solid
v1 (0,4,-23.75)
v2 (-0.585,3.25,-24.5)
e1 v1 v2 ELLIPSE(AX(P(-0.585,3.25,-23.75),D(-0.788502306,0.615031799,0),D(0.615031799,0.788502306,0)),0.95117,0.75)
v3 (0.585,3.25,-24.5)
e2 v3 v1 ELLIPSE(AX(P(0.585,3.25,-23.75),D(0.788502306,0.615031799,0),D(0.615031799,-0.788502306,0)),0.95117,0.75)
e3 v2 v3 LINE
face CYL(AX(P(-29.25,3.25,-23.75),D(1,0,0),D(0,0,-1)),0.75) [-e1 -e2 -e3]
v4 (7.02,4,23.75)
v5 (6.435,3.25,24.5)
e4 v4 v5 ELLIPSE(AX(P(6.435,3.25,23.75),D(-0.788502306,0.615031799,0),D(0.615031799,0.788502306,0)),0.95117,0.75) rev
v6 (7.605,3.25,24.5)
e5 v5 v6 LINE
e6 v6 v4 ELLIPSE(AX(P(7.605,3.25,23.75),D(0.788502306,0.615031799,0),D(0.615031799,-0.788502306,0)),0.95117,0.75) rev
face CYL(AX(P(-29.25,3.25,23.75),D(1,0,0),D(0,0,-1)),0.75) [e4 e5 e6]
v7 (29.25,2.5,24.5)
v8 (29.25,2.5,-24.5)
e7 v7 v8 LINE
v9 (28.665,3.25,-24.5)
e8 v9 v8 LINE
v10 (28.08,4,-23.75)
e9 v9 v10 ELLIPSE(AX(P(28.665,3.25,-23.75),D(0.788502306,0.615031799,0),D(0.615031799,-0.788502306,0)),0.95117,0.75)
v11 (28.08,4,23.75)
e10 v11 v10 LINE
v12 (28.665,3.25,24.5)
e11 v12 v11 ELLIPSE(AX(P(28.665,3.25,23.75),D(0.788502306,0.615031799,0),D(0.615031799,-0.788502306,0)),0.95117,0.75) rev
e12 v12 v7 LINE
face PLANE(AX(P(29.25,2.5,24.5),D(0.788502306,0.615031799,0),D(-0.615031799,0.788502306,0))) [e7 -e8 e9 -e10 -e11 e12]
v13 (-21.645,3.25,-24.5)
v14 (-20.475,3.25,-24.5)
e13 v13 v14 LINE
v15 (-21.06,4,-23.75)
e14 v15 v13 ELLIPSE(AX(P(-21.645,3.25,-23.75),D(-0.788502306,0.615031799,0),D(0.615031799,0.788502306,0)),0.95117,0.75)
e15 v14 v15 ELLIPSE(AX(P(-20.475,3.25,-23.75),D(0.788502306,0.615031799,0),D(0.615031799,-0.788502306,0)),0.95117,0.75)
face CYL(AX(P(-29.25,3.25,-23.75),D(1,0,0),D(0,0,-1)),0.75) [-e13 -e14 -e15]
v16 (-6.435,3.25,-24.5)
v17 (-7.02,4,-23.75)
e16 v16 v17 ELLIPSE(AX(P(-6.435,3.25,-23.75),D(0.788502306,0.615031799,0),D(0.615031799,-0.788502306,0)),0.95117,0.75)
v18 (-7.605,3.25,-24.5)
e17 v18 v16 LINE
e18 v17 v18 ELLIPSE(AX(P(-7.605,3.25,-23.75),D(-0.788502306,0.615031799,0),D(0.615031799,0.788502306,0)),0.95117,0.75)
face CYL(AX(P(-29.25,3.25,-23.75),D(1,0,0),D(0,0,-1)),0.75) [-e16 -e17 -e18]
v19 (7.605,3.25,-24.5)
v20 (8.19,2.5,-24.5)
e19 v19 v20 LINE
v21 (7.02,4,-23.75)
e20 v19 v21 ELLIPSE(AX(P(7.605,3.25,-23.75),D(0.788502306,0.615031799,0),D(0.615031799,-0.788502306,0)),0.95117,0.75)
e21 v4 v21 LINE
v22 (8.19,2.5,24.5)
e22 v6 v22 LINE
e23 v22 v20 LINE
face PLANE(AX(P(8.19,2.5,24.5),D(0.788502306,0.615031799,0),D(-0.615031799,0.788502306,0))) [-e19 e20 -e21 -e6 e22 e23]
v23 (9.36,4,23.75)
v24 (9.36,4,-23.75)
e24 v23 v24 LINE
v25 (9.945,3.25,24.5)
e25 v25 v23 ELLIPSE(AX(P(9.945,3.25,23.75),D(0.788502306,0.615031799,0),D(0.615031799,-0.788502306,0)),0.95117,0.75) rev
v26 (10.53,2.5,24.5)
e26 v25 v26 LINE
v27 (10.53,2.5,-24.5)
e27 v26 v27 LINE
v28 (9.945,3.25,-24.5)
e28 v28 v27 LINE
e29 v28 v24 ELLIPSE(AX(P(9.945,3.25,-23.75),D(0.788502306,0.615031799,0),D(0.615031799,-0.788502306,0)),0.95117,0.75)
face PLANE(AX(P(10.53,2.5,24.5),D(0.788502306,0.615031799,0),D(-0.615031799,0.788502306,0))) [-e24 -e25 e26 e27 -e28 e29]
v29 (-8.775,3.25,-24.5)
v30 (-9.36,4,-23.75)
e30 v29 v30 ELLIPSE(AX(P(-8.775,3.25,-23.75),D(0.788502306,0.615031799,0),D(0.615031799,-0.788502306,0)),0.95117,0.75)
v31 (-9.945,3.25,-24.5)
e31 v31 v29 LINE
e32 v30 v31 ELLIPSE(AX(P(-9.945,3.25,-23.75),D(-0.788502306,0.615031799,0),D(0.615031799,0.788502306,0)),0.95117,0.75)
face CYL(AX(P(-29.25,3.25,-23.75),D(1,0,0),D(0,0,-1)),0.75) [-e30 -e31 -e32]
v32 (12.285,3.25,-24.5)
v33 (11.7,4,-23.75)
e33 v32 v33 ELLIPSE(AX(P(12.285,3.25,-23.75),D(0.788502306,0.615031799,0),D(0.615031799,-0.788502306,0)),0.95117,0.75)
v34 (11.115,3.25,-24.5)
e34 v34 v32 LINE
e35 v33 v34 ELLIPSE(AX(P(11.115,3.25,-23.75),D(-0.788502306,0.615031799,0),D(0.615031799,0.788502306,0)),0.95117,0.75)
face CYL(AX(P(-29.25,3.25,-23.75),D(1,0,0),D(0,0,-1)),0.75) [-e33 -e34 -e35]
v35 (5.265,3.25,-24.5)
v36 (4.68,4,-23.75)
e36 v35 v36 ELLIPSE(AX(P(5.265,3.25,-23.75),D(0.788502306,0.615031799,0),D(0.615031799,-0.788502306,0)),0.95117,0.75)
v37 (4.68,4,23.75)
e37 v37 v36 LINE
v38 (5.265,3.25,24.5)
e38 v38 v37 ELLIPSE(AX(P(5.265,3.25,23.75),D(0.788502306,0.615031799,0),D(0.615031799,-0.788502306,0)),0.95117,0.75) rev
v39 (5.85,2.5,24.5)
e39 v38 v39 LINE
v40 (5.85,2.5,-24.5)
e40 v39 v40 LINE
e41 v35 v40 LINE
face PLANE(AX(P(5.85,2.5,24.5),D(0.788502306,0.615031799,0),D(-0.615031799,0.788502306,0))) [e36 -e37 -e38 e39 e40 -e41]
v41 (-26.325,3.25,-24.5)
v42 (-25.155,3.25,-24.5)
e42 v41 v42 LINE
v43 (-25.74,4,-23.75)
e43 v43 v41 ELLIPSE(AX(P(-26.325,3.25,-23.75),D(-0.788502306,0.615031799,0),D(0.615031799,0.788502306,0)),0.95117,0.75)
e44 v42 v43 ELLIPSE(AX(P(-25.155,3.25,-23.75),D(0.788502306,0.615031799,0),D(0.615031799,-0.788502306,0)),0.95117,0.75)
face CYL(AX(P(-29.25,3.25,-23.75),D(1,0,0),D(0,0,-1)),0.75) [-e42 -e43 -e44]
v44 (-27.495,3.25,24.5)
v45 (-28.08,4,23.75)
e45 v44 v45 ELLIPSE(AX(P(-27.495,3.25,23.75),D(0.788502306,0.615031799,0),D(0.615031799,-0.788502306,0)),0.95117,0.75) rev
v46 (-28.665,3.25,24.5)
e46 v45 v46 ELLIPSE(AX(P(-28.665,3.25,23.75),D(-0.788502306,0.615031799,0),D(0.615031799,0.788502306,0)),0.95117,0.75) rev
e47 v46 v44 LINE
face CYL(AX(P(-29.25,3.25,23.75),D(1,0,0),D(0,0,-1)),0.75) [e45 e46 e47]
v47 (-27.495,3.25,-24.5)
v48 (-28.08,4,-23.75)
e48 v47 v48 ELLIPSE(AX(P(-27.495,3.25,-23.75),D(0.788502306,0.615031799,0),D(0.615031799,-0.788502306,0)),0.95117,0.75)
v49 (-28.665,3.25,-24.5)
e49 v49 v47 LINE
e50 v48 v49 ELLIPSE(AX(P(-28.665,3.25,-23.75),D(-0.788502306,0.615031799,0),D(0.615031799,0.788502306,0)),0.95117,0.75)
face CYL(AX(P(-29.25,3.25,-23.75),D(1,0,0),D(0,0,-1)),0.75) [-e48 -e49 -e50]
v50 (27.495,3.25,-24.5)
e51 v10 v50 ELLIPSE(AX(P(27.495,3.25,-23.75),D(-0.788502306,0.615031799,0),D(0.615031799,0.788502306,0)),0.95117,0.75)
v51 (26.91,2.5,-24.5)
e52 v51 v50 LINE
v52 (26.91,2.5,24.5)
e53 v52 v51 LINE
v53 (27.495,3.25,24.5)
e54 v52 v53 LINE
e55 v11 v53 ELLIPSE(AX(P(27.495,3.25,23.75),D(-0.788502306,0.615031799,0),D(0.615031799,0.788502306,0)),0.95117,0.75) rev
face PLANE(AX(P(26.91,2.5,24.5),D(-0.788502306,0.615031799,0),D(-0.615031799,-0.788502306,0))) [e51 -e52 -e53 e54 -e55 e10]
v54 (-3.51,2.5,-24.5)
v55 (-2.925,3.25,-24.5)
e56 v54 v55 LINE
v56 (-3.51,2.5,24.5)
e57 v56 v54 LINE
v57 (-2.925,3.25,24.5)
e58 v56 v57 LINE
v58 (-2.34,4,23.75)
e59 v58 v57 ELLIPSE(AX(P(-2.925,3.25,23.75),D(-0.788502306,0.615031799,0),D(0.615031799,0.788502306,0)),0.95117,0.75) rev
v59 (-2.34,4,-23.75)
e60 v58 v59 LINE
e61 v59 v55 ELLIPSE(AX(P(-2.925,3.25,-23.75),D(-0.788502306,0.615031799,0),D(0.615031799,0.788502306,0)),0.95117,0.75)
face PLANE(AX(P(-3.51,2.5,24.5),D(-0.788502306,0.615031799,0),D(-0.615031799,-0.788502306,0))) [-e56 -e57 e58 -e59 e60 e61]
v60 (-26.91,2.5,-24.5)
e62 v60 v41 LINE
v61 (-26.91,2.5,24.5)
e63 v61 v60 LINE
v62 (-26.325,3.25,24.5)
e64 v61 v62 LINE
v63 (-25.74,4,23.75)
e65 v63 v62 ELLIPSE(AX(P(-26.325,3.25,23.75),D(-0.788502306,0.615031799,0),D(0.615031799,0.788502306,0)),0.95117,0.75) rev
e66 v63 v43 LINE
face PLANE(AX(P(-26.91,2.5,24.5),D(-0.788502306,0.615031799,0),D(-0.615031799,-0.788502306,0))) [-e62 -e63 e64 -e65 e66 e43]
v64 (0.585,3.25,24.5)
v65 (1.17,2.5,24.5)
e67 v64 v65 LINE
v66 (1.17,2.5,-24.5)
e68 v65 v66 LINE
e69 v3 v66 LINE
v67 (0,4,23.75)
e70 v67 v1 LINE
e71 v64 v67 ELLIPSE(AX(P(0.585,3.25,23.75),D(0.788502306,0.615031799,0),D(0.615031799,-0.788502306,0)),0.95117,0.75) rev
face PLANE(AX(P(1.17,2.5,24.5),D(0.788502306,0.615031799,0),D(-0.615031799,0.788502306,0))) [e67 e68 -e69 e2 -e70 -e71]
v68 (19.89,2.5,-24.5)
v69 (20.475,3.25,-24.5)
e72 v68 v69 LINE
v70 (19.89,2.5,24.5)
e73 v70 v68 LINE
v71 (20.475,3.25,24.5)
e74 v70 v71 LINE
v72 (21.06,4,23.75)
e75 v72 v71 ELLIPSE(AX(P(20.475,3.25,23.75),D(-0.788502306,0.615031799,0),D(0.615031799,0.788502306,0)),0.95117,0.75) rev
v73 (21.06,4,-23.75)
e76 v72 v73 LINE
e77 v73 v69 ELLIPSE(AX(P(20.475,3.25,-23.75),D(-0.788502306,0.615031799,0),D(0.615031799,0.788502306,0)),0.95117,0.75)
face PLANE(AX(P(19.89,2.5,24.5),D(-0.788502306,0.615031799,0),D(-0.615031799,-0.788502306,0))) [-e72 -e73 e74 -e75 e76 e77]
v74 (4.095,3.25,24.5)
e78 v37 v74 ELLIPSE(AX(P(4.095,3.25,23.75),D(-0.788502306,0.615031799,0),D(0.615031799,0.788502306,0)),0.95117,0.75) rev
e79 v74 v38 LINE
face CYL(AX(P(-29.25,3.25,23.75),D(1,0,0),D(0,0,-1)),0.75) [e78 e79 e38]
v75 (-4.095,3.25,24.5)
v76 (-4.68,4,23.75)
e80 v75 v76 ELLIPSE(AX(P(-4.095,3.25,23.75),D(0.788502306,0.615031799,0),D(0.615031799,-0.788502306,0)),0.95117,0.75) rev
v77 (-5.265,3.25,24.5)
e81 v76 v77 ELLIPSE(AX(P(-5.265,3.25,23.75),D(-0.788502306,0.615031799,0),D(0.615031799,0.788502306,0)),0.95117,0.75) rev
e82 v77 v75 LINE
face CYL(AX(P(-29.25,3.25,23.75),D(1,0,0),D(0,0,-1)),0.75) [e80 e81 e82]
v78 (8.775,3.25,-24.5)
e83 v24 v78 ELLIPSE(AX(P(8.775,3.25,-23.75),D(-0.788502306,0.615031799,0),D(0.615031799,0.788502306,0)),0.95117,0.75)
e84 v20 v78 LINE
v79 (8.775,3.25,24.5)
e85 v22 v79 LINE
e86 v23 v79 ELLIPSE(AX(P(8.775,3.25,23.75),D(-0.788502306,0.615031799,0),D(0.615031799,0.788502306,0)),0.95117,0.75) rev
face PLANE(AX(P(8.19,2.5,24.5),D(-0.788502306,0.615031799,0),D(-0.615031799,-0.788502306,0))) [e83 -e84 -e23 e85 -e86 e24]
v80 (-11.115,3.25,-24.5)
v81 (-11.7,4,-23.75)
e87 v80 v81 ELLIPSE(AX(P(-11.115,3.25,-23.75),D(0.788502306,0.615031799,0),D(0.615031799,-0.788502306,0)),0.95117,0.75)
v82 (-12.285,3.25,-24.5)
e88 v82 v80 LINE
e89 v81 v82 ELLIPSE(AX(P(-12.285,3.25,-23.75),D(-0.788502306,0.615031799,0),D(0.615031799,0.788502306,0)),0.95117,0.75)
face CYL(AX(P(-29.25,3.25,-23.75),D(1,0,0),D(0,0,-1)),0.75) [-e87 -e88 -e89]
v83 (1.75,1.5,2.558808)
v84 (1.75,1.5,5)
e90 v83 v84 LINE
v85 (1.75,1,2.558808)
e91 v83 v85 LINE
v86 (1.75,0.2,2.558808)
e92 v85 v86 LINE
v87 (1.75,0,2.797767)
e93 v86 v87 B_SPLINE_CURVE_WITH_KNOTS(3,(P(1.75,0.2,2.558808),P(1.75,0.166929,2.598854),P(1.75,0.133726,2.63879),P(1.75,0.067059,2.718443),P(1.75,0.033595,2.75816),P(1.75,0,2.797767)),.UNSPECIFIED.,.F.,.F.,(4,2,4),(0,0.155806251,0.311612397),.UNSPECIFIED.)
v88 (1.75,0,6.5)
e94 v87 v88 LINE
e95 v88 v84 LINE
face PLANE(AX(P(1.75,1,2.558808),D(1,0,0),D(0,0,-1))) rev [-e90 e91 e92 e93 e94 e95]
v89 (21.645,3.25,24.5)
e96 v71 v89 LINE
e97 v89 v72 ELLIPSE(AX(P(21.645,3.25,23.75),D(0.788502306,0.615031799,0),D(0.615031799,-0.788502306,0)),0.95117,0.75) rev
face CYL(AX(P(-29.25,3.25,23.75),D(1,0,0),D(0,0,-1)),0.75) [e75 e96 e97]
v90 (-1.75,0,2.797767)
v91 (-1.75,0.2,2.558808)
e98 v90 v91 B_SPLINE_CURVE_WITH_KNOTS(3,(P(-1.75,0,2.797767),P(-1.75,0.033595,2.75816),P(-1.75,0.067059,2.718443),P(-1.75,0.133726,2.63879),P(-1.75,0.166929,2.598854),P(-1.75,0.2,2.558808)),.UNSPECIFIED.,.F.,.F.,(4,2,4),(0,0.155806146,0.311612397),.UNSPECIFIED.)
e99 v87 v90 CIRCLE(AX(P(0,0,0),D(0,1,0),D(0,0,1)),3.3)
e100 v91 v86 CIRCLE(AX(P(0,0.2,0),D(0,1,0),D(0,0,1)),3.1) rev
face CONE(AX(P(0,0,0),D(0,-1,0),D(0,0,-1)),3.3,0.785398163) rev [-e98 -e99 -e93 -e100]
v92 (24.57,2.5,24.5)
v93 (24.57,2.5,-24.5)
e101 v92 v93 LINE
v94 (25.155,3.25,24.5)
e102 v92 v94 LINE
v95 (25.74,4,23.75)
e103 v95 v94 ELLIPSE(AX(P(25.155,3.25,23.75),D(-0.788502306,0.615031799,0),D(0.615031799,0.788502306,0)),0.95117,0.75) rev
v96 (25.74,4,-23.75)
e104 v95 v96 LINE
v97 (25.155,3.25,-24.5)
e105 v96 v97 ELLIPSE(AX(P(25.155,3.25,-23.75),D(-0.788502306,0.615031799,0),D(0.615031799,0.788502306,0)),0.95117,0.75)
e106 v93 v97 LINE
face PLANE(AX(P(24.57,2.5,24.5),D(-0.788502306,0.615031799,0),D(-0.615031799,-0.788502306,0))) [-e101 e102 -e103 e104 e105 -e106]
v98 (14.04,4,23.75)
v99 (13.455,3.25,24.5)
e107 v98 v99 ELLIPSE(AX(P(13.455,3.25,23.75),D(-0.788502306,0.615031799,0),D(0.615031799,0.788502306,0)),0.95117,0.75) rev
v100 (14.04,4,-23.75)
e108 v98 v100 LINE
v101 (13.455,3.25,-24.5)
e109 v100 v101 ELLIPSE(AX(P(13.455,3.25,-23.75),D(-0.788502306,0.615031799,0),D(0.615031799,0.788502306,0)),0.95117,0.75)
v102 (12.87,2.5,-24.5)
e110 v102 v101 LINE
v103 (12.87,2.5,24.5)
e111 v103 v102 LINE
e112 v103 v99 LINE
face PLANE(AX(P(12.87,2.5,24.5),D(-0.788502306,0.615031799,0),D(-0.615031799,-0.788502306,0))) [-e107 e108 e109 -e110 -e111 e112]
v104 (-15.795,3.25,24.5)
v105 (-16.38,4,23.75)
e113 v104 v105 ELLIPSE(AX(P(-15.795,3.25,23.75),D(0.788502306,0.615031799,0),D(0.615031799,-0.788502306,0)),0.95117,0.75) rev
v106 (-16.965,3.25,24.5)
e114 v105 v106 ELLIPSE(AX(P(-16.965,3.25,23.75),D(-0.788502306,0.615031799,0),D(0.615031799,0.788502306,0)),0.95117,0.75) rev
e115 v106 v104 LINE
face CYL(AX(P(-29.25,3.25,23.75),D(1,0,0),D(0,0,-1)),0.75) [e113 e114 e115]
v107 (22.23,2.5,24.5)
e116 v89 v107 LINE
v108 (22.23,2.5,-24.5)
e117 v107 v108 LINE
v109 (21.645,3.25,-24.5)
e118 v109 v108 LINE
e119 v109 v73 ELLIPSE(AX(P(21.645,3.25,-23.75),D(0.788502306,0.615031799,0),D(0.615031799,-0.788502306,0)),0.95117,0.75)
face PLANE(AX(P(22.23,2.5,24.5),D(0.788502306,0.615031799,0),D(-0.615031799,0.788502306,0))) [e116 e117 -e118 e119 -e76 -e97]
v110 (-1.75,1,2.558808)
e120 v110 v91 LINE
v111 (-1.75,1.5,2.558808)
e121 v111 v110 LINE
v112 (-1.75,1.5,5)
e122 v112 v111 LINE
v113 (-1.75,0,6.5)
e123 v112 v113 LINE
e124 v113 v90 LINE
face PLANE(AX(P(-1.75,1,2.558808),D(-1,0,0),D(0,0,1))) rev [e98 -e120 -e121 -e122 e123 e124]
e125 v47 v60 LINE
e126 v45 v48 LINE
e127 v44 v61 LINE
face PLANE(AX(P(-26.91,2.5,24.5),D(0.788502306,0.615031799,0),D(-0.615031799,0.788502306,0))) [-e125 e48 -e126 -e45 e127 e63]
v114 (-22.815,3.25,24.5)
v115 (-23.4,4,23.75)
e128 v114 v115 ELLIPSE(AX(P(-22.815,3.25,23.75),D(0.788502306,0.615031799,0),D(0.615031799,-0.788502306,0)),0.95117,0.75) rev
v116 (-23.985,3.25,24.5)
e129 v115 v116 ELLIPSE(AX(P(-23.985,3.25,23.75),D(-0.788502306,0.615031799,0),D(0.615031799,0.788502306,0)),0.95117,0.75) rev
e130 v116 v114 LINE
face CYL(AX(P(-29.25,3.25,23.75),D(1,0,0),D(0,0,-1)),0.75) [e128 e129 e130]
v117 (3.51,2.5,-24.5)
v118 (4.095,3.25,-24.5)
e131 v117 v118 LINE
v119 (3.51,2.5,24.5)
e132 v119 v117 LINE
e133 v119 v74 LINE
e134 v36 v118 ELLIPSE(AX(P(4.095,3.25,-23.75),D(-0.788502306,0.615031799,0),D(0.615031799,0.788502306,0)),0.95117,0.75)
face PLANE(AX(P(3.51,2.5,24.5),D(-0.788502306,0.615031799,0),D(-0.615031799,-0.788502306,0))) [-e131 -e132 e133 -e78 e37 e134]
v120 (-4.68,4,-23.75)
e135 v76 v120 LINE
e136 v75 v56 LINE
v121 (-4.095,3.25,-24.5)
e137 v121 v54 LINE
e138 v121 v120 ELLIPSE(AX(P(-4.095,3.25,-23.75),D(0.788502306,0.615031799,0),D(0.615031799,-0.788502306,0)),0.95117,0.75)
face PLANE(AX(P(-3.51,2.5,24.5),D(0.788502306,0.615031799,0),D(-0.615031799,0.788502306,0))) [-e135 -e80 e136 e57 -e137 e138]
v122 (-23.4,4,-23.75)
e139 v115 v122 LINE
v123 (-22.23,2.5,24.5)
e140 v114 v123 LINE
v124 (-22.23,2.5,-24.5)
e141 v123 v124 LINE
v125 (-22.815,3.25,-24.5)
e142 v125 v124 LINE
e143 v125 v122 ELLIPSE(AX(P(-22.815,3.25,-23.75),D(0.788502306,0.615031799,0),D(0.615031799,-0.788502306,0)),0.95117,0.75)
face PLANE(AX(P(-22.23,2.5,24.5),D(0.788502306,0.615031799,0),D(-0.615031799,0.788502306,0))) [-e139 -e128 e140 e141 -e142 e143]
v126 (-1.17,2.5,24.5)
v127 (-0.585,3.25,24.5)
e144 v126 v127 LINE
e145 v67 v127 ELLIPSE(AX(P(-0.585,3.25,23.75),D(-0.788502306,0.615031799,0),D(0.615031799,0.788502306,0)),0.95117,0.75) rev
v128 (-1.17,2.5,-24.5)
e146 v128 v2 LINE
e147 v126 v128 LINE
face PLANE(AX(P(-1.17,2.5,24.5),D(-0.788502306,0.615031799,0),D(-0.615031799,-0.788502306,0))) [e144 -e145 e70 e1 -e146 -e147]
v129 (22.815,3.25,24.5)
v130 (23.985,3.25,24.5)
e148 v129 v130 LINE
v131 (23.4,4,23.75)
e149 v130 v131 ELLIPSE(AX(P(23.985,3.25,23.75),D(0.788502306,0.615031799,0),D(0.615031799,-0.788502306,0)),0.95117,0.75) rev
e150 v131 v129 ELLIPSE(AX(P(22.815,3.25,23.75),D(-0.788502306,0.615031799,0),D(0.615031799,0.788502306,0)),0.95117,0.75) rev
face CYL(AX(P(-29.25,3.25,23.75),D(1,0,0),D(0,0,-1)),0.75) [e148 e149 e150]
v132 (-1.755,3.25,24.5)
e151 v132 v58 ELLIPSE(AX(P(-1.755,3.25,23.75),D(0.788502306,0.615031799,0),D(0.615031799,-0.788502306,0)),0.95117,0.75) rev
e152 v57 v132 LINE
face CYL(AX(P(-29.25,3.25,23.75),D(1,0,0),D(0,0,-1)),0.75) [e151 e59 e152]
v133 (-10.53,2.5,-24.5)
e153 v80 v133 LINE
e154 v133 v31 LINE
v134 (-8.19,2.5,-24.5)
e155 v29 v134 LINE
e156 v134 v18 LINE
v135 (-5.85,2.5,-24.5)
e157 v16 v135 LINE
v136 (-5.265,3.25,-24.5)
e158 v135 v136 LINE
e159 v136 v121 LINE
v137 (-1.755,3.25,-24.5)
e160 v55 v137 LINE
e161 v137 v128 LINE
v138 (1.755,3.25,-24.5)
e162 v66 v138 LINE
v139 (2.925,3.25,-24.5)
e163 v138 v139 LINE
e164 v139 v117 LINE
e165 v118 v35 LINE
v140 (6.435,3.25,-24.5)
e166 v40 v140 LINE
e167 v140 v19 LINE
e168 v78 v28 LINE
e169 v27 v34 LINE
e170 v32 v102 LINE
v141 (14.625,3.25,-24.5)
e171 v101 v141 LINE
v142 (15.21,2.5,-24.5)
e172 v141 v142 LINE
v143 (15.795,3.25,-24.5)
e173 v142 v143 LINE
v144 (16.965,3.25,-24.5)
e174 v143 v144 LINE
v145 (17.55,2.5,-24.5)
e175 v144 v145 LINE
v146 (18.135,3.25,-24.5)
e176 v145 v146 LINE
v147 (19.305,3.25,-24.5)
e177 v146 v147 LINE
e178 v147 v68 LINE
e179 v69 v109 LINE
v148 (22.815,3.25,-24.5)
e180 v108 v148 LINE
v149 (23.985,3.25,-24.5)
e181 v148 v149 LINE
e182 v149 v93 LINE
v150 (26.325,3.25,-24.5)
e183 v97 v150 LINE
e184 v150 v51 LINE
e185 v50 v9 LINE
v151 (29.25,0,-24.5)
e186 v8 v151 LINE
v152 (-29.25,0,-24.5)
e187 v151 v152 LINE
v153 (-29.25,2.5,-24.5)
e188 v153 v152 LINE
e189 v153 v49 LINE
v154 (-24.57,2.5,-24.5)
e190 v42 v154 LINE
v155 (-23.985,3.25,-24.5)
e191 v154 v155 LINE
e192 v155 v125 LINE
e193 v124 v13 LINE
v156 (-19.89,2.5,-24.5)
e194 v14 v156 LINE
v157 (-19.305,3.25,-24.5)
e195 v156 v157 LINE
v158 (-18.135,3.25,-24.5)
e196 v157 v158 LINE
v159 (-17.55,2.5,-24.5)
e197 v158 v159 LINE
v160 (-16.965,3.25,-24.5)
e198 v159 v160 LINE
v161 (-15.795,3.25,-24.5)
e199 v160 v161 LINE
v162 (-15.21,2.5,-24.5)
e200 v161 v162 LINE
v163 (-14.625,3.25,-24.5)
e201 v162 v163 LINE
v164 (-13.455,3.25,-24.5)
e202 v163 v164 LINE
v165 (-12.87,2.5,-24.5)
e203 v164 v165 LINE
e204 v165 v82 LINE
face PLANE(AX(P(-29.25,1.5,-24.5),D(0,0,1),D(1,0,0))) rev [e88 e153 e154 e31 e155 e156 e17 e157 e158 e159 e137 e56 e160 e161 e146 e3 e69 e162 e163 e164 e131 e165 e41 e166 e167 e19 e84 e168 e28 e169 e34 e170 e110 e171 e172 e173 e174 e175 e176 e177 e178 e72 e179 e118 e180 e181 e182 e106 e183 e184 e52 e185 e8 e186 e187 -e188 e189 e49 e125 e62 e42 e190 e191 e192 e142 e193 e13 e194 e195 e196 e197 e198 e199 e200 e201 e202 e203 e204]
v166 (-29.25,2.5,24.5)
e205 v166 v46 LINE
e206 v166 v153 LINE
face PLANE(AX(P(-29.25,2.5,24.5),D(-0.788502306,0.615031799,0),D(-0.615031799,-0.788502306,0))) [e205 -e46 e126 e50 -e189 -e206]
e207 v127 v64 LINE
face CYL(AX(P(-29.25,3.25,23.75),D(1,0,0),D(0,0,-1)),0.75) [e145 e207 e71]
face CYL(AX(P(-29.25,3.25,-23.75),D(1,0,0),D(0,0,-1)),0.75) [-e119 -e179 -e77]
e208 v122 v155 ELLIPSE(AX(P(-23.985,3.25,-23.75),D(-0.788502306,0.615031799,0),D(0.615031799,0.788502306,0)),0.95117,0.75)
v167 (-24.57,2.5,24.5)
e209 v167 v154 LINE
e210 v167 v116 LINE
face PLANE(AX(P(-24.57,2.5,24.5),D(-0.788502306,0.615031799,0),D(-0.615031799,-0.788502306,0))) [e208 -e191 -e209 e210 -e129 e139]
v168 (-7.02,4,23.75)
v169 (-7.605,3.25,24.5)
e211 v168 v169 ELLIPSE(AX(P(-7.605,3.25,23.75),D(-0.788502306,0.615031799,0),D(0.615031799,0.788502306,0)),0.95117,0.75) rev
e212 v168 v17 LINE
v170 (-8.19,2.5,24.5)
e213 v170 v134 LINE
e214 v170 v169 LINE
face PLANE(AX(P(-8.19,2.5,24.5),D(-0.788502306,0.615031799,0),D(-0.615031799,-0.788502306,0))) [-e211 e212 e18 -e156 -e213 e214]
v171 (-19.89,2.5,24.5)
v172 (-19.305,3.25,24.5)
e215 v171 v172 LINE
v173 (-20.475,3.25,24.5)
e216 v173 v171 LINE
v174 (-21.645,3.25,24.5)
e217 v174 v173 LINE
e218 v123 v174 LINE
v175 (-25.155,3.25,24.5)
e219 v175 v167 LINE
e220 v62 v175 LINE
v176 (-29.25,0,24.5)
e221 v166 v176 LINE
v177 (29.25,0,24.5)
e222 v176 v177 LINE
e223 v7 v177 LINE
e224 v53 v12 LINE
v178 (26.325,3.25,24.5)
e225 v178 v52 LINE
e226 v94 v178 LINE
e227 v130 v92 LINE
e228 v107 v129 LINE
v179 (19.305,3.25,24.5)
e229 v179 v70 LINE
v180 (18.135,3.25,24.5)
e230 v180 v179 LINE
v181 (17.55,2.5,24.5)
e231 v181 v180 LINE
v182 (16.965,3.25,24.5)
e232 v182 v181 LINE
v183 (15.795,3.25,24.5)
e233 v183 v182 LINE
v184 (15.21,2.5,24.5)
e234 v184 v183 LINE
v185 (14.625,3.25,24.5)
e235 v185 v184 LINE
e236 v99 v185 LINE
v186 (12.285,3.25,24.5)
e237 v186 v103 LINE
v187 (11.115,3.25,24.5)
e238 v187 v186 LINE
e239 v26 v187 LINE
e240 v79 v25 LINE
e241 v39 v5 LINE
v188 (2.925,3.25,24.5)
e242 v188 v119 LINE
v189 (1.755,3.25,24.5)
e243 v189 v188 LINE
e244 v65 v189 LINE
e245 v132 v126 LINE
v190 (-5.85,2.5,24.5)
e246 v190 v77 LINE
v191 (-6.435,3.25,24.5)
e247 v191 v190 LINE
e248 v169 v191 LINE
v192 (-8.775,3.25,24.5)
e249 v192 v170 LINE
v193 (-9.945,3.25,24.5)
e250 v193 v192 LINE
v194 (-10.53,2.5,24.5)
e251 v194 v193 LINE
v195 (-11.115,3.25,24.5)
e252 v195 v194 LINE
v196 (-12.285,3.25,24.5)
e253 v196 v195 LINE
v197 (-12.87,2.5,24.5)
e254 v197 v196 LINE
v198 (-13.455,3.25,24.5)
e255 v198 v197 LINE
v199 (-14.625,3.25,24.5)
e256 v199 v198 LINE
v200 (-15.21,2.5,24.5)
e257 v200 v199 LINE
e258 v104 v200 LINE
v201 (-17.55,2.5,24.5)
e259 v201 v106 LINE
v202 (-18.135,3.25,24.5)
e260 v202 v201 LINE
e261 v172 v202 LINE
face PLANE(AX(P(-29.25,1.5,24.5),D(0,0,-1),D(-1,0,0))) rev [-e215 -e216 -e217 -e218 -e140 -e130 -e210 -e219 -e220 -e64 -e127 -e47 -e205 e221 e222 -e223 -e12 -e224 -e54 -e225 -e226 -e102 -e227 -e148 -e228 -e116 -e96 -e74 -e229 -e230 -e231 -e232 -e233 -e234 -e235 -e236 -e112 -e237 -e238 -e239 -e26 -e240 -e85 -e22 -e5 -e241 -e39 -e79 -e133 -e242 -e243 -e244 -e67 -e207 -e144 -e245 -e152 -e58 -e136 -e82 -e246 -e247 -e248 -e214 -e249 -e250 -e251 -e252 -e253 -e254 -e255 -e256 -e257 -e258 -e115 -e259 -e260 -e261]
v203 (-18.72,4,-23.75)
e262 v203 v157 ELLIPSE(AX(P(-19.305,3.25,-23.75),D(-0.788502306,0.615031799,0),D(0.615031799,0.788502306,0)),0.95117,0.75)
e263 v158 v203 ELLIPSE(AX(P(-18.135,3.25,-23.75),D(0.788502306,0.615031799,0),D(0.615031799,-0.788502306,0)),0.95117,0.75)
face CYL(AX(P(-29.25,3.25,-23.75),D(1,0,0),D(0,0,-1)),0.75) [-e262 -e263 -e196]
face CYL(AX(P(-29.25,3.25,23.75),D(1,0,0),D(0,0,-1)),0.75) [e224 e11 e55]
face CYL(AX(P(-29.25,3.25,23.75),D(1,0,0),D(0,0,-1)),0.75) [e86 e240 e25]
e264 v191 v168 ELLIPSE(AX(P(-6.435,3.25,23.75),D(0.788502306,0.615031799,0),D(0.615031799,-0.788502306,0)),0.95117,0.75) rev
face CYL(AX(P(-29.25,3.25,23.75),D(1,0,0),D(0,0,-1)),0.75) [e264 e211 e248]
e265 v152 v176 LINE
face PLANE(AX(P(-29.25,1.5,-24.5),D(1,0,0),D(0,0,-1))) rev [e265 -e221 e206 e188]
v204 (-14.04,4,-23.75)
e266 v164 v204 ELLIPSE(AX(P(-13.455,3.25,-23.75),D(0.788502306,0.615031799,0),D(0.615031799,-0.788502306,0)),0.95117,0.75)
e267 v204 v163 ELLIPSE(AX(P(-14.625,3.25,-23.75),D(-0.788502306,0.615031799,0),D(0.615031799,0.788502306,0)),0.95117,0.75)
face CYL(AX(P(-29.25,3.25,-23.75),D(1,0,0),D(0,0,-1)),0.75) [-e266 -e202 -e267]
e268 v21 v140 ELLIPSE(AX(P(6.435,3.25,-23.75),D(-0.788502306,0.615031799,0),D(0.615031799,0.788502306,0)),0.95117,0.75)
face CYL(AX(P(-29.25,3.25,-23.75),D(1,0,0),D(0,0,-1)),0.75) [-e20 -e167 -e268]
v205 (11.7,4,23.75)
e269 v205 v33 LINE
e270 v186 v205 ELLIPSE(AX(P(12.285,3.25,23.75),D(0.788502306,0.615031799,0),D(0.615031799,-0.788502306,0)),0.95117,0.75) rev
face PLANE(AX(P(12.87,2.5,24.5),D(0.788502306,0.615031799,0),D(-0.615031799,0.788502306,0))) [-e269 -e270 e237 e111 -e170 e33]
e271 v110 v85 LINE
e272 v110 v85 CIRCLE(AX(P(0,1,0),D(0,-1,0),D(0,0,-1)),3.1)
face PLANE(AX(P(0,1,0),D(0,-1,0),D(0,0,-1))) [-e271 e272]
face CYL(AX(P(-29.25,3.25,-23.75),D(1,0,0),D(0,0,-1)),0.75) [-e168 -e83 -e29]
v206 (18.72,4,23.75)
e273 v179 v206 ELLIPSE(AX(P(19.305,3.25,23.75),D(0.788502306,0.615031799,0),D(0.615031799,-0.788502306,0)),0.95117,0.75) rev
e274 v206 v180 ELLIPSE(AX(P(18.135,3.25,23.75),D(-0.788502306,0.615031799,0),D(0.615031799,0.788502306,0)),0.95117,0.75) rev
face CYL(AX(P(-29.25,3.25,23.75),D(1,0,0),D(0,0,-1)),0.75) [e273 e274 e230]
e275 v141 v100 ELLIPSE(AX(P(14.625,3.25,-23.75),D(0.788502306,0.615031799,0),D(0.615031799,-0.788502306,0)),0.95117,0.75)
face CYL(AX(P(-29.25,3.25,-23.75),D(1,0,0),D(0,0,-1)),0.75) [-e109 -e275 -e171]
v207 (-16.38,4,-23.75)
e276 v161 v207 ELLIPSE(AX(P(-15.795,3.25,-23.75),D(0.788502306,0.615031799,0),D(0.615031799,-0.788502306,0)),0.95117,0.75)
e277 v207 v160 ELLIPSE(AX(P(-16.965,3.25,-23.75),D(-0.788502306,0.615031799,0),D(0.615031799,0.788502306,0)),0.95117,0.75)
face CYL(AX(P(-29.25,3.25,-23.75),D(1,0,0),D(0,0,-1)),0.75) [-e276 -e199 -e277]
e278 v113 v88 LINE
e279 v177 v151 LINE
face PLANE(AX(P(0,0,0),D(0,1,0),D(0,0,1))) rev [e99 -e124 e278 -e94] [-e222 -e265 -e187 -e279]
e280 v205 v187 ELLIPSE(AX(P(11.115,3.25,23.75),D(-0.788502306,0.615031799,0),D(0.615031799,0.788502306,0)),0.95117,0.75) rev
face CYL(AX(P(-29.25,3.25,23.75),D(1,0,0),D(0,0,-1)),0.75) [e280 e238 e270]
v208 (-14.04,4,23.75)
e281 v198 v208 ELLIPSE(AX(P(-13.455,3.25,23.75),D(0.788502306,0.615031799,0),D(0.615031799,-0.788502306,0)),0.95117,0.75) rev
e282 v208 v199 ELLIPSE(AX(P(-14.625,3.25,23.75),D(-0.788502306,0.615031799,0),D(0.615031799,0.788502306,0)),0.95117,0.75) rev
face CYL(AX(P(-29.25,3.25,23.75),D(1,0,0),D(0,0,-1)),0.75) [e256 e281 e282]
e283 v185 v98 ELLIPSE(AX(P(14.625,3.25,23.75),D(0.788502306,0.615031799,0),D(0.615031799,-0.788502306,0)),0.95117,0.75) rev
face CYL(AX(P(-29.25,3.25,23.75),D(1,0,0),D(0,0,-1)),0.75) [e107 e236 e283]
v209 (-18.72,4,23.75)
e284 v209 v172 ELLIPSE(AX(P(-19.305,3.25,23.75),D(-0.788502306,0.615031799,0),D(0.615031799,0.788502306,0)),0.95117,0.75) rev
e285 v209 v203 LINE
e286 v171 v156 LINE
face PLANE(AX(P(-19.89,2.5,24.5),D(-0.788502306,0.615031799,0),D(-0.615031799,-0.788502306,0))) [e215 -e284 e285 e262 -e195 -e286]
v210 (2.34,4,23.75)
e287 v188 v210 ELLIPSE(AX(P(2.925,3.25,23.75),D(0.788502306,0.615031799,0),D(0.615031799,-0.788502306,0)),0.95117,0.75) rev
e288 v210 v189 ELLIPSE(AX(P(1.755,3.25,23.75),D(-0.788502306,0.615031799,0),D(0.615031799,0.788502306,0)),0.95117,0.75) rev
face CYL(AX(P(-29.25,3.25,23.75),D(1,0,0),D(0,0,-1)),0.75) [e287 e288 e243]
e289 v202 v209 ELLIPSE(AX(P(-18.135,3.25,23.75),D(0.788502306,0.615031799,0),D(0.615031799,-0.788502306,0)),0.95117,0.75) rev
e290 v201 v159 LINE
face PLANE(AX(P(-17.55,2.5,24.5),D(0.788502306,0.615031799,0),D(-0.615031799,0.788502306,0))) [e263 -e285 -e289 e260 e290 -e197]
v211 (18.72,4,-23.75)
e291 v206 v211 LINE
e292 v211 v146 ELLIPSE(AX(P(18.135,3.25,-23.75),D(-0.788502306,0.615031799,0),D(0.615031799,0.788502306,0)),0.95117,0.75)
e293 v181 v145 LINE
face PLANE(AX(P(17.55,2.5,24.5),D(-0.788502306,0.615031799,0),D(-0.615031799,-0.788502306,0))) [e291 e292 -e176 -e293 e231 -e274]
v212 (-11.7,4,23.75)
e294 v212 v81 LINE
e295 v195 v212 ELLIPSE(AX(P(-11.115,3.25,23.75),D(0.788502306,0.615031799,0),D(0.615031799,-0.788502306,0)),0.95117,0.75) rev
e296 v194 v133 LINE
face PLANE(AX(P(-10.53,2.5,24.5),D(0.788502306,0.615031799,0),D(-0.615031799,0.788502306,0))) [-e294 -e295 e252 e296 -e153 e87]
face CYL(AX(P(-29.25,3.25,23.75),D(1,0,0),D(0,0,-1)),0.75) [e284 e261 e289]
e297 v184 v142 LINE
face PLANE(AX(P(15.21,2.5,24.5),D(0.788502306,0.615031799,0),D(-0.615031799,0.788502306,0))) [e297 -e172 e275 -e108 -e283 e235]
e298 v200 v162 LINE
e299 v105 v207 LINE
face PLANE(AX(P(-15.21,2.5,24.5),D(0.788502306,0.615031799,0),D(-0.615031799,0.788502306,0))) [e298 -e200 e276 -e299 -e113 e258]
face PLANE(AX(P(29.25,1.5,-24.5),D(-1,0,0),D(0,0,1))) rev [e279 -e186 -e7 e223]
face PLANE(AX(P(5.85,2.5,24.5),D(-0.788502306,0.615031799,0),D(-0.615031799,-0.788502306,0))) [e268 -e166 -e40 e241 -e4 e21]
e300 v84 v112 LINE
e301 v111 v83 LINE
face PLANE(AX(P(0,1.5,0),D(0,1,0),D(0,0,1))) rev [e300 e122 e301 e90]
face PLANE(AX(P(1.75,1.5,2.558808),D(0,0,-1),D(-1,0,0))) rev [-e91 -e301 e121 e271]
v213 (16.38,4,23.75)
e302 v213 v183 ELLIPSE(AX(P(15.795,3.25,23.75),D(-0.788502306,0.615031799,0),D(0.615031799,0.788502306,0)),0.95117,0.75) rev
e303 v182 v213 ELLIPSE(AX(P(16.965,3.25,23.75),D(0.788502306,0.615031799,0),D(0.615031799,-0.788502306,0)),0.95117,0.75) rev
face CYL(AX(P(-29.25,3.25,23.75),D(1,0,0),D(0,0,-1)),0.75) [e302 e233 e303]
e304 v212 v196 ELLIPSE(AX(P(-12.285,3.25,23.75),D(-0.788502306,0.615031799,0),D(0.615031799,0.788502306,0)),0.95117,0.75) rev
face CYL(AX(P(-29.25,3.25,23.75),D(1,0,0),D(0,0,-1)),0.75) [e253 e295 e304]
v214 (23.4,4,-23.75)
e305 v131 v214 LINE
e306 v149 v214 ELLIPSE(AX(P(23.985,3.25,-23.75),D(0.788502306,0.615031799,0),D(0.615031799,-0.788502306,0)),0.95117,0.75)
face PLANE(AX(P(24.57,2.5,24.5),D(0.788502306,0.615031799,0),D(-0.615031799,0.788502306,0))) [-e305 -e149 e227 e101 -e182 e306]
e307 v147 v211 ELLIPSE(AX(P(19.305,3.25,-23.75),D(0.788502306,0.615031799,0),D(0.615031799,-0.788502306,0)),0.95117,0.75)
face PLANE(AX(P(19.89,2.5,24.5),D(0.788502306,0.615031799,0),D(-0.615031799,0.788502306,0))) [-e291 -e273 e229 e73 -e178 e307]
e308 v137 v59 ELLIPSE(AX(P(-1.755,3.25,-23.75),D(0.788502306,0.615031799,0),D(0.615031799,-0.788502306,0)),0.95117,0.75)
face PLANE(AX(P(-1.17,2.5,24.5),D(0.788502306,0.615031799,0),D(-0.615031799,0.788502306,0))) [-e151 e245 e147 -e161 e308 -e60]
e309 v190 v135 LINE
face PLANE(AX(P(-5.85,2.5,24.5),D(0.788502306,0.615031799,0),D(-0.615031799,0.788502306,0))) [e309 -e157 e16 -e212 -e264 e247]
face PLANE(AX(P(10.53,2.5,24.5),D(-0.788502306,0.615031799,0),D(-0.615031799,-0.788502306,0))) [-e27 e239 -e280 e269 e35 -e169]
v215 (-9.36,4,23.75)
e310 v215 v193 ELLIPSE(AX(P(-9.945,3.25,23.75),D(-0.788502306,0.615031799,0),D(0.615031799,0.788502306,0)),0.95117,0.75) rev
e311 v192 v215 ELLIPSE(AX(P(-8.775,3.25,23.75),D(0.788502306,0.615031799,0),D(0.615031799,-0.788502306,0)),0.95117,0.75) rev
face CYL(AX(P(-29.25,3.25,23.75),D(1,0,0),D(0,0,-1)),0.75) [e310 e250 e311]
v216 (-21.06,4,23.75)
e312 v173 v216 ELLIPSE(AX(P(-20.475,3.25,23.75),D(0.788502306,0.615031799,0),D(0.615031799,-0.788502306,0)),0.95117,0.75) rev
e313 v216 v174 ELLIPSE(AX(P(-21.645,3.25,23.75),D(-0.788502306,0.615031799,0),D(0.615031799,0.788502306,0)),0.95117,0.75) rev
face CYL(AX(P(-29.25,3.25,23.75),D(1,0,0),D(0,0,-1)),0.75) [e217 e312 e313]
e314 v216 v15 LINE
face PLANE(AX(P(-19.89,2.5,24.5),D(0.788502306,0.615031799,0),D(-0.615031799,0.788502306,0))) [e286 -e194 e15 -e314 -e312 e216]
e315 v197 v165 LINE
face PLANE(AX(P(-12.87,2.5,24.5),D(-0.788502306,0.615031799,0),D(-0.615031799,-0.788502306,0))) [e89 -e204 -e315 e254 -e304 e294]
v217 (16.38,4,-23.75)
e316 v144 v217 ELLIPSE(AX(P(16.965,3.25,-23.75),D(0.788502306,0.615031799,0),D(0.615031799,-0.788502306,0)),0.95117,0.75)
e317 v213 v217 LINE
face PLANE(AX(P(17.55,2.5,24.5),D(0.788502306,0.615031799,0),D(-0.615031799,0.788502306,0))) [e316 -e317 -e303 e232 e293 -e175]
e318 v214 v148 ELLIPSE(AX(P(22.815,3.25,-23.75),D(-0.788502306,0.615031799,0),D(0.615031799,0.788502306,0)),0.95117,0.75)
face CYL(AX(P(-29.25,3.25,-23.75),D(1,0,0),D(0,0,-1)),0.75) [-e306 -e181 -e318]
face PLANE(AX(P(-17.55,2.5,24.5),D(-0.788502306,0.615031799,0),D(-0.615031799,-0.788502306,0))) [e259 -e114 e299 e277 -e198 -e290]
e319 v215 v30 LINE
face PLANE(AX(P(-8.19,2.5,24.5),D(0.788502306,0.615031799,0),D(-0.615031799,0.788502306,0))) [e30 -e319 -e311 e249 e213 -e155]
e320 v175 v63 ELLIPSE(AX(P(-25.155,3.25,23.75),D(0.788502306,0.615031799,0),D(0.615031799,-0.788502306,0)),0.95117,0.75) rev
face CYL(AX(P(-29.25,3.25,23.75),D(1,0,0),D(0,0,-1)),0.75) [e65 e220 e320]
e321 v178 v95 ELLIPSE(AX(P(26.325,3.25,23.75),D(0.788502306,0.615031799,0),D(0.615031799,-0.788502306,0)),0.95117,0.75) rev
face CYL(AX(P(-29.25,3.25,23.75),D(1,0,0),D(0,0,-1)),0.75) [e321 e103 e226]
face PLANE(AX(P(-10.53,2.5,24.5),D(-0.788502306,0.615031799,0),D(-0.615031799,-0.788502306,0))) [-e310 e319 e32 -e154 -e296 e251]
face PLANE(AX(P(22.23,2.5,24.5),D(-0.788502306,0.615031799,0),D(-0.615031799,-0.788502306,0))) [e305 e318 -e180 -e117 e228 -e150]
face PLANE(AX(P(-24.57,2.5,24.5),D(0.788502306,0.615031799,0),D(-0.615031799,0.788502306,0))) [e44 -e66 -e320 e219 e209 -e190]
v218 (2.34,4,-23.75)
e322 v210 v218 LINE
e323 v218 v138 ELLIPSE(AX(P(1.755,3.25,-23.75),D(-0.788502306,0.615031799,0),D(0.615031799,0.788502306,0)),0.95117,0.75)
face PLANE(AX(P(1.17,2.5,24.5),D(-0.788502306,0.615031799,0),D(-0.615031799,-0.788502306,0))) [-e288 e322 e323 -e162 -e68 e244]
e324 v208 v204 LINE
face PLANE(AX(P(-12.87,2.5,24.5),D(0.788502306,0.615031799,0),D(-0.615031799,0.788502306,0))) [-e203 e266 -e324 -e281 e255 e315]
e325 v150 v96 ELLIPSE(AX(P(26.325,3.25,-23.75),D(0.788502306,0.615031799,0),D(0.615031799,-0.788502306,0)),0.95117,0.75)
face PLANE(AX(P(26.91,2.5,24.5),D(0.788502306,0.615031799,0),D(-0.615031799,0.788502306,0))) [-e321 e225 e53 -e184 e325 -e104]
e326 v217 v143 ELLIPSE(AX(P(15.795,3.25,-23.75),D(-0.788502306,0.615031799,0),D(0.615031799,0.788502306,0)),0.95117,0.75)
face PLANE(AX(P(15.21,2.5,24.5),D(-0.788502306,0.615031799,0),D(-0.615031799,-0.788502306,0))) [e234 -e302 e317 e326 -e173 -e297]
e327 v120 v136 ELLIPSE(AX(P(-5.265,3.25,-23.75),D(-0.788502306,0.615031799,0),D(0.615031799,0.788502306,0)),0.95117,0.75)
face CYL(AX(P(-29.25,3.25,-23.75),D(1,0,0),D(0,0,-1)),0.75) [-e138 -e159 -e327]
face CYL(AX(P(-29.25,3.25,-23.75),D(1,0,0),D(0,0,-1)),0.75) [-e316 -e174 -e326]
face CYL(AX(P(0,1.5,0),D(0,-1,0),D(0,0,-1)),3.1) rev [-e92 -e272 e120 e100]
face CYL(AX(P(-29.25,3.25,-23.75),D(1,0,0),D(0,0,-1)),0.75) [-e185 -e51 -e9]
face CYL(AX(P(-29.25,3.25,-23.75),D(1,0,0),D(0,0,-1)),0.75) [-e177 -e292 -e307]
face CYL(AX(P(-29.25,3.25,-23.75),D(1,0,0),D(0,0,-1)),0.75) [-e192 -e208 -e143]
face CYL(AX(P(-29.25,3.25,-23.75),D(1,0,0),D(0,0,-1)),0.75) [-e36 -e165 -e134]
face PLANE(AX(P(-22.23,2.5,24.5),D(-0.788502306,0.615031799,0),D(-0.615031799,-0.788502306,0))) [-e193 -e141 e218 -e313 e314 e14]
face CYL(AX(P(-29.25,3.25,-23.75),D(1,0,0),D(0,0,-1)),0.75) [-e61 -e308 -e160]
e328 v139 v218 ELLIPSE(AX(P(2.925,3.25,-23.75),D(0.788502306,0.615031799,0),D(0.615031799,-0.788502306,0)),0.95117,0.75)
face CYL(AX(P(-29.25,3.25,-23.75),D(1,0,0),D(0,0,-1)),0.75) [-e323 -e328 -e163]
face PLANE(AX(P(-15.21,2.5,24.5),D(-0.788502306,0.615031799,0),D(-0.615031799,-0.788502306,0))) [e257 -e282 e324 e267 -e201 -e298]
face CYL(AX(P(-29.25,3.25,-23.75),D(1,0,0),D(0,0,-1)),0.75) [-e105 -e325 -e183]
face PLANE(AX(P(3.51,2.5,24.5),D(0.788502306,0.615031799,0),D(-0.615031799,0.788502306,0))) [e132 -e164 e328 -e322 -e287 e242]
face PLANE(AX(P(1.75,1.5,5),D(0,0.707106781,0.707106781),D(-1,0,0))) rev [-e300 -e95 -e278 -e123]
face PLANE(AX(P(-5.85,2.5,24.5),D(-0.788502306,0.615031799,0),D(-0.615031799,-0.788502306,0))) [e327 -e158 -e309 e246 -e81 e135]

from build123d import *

# Parameters (mm, degrees)
SKETCH1_W           = 58.5
SKETCH1_H           = 49
SKETCH1_R           = 3.1
BOSS_EXTRUDE1_DEPTH = 1.5
BOSS_EXTRUDE2_DEPTH = 49
CUT_EXTRUDE1_DEPTH  = 1
CHAMFER2_SIZE       = 0.2
CUT_EXTRUDE3_DEPTH  = 64.549193543
BOSS_EXTRUDE3_START = 0.5
SKETCH5_R           = 3.1
BOSS_EXTRUDE3_DEPTH = 0.5
SKETCH6_W           = 3.5
SKETCH6_H           = 2.441191684
CUT_EXTRUDE4_DEPTH  = 0.5
CHAMFER3_SIZE       = 1.5


with BuildPart() as part:
    # Sketch1 → Boss-Extrude1 (new body)
    with BuildSketch(Plane(origin=(0, 0, 0), x_dir=(1, 0, 0), z_dir=(0, 1, 0))):
        Rectangle(SKETCH1_W, SKETCH1_H)
        with Locations(Location((0, 0, 0), (0, 0, 270))):
            Circle(SKETCH1_R, mode=Mode.SUBTRACT)
    extrude(amount=BOSS_EXTRUDE1_DEPTH)

    # Sketch2 → Boss-Extrude2 (add)
    with BuildSketch(Plane(origin=(0, 0, -24.5), x_dir=(-1, 0, 0), z_dir=(0, 0, -1))):
        Polygon((-29.25, 1.5), (29.25, 1.5), (29.25, 2.5), (28.08, 4), (26.91, 2.5), (25.74, 4), (24.57, 2.5), (23.4, 4), (22.23, 2.5), (21.06, 4), (19.89, 2.5), (18.72, 4), (17.55, 2.5), (16.38, 4), (15.21, 2.5), (14.04, 4), (12.87, 2.5), (11.7, 4), (10.53, 2.5), (9.36, 4), (8.19, 2.5), (7.02, 4), (5.85, 2.5), (4.68, 4), (3.51, 2.5), (2.34, 4), (1.17, 2.5), (0, 4), (-1.17, 2.5), (-2.34, 4), (-3.51, 2.5), (-4.68, 4), (-5.85, 2.5), (-7.02, 4), (-8.19, 2.5), (-9.36, 4), (-10.53, 2.5), (-11.7, 4), (-12.87, 2.5), (-14.04, 4), (-15.21, 2.5), (-16.38, 4), (-17.55, 2.5), (-18.72, 4), (-19.89, 2.5), (-21.06, 4), (-22.23, 2.5), (-23.4, 4), (-24.57, 2.5), (-25.74, 4), (-26.91, 2.5), (-28.08, 4), (-29.25, 2.5), align=None)
    extrude(amount=-BOSS_EXTRUDE2_DEPTH)

    # Sketch3 → Cut-Extrude1 (cut)
    with BuildSketch(Plane(origin=(0, 0, 0), x_dir=(-1, 0, 0), z_dir=(0, -1, 0))):
        with BuildLine():
            Line((-1.75, -2.558808316), (-1.75, -5))
            Line((-1.75, -5), (1.75, -5))
            Line((1.75, -5), (1.75, -2.558808316))
            ThreePointArc((1.75, -2.558808316), (0, 3.1), (-1.75, -2.558808316))
        make_face()
    extrude(amount=-CUT_EXTRUDE1_DEPTH, mode=Mode.SUBTRACT)

    # Chamfer2
    chamfer2_edges = [part.edges().sort_by_distance(p)[0] for p in [
        (0, 0, -3.1),
    ]]
    chamfer(chamfer2_edges, length=CHAMFER2_SIZE)

    # Sketch4 → Cut-Extrude3 (cut, through all)
    with BuildSketch(Plane(origin=(29.25, 0, 0), x_dir=(0, 0, -1), z_dir=(1, 0, 0))):
        with BuildLine():
            Line((-23.75, 4), (-24.5, 4))
            Line((-24.5, 4), (-24.5, 3.25))
            ThreePointArc((-24.5, 3.25), (-24.280330086, 3.780330086), (-23.75, 4))
        make_face()
    cut_extrude3 = extrude(amount=-CUT_EXTRUDE3_DEPTH, mode=Mode.SUBTRACT)

    # Mirror1: Cut-Extrude3 across plane
    add(cut_extrude3.mirror(Plane.XY), mode=Mode.SUBTRACT)

    # Sketch5 → Boss-Extrude3 (add)
    with BuildSketch(Plane.XZ.offset(-1.5).offset(BOSS_EXTRUDE3_START)):
        Circle(SKETCH5_R)
    extrude(amount=-BOSS_EXTRUDE3_DEPTH)

    # Sketch6 → Cut-Extrude4 (cut)
    with BuildSketch(Plane.XZ.offset(-1)):
        with Locations((0, 3.779404158)):
            Rectangle(SKETCH6_W, SKETCH6_H)
    extrude(amount=-CUT_EXTRUDE4_DEPTH, mode=Mode.SUBTRACT)

    # Chamfer3
    chamfer3_edges = [part.edges().sort_by_distance(p)[0] for p in [
        (0, 0, 5),
    ]]
    chamfer(chamfer3_edges, length=CHAMFER3_SIZE - 0.0001)  # a hair under: the kernel refuses the full size


solid = part.part
